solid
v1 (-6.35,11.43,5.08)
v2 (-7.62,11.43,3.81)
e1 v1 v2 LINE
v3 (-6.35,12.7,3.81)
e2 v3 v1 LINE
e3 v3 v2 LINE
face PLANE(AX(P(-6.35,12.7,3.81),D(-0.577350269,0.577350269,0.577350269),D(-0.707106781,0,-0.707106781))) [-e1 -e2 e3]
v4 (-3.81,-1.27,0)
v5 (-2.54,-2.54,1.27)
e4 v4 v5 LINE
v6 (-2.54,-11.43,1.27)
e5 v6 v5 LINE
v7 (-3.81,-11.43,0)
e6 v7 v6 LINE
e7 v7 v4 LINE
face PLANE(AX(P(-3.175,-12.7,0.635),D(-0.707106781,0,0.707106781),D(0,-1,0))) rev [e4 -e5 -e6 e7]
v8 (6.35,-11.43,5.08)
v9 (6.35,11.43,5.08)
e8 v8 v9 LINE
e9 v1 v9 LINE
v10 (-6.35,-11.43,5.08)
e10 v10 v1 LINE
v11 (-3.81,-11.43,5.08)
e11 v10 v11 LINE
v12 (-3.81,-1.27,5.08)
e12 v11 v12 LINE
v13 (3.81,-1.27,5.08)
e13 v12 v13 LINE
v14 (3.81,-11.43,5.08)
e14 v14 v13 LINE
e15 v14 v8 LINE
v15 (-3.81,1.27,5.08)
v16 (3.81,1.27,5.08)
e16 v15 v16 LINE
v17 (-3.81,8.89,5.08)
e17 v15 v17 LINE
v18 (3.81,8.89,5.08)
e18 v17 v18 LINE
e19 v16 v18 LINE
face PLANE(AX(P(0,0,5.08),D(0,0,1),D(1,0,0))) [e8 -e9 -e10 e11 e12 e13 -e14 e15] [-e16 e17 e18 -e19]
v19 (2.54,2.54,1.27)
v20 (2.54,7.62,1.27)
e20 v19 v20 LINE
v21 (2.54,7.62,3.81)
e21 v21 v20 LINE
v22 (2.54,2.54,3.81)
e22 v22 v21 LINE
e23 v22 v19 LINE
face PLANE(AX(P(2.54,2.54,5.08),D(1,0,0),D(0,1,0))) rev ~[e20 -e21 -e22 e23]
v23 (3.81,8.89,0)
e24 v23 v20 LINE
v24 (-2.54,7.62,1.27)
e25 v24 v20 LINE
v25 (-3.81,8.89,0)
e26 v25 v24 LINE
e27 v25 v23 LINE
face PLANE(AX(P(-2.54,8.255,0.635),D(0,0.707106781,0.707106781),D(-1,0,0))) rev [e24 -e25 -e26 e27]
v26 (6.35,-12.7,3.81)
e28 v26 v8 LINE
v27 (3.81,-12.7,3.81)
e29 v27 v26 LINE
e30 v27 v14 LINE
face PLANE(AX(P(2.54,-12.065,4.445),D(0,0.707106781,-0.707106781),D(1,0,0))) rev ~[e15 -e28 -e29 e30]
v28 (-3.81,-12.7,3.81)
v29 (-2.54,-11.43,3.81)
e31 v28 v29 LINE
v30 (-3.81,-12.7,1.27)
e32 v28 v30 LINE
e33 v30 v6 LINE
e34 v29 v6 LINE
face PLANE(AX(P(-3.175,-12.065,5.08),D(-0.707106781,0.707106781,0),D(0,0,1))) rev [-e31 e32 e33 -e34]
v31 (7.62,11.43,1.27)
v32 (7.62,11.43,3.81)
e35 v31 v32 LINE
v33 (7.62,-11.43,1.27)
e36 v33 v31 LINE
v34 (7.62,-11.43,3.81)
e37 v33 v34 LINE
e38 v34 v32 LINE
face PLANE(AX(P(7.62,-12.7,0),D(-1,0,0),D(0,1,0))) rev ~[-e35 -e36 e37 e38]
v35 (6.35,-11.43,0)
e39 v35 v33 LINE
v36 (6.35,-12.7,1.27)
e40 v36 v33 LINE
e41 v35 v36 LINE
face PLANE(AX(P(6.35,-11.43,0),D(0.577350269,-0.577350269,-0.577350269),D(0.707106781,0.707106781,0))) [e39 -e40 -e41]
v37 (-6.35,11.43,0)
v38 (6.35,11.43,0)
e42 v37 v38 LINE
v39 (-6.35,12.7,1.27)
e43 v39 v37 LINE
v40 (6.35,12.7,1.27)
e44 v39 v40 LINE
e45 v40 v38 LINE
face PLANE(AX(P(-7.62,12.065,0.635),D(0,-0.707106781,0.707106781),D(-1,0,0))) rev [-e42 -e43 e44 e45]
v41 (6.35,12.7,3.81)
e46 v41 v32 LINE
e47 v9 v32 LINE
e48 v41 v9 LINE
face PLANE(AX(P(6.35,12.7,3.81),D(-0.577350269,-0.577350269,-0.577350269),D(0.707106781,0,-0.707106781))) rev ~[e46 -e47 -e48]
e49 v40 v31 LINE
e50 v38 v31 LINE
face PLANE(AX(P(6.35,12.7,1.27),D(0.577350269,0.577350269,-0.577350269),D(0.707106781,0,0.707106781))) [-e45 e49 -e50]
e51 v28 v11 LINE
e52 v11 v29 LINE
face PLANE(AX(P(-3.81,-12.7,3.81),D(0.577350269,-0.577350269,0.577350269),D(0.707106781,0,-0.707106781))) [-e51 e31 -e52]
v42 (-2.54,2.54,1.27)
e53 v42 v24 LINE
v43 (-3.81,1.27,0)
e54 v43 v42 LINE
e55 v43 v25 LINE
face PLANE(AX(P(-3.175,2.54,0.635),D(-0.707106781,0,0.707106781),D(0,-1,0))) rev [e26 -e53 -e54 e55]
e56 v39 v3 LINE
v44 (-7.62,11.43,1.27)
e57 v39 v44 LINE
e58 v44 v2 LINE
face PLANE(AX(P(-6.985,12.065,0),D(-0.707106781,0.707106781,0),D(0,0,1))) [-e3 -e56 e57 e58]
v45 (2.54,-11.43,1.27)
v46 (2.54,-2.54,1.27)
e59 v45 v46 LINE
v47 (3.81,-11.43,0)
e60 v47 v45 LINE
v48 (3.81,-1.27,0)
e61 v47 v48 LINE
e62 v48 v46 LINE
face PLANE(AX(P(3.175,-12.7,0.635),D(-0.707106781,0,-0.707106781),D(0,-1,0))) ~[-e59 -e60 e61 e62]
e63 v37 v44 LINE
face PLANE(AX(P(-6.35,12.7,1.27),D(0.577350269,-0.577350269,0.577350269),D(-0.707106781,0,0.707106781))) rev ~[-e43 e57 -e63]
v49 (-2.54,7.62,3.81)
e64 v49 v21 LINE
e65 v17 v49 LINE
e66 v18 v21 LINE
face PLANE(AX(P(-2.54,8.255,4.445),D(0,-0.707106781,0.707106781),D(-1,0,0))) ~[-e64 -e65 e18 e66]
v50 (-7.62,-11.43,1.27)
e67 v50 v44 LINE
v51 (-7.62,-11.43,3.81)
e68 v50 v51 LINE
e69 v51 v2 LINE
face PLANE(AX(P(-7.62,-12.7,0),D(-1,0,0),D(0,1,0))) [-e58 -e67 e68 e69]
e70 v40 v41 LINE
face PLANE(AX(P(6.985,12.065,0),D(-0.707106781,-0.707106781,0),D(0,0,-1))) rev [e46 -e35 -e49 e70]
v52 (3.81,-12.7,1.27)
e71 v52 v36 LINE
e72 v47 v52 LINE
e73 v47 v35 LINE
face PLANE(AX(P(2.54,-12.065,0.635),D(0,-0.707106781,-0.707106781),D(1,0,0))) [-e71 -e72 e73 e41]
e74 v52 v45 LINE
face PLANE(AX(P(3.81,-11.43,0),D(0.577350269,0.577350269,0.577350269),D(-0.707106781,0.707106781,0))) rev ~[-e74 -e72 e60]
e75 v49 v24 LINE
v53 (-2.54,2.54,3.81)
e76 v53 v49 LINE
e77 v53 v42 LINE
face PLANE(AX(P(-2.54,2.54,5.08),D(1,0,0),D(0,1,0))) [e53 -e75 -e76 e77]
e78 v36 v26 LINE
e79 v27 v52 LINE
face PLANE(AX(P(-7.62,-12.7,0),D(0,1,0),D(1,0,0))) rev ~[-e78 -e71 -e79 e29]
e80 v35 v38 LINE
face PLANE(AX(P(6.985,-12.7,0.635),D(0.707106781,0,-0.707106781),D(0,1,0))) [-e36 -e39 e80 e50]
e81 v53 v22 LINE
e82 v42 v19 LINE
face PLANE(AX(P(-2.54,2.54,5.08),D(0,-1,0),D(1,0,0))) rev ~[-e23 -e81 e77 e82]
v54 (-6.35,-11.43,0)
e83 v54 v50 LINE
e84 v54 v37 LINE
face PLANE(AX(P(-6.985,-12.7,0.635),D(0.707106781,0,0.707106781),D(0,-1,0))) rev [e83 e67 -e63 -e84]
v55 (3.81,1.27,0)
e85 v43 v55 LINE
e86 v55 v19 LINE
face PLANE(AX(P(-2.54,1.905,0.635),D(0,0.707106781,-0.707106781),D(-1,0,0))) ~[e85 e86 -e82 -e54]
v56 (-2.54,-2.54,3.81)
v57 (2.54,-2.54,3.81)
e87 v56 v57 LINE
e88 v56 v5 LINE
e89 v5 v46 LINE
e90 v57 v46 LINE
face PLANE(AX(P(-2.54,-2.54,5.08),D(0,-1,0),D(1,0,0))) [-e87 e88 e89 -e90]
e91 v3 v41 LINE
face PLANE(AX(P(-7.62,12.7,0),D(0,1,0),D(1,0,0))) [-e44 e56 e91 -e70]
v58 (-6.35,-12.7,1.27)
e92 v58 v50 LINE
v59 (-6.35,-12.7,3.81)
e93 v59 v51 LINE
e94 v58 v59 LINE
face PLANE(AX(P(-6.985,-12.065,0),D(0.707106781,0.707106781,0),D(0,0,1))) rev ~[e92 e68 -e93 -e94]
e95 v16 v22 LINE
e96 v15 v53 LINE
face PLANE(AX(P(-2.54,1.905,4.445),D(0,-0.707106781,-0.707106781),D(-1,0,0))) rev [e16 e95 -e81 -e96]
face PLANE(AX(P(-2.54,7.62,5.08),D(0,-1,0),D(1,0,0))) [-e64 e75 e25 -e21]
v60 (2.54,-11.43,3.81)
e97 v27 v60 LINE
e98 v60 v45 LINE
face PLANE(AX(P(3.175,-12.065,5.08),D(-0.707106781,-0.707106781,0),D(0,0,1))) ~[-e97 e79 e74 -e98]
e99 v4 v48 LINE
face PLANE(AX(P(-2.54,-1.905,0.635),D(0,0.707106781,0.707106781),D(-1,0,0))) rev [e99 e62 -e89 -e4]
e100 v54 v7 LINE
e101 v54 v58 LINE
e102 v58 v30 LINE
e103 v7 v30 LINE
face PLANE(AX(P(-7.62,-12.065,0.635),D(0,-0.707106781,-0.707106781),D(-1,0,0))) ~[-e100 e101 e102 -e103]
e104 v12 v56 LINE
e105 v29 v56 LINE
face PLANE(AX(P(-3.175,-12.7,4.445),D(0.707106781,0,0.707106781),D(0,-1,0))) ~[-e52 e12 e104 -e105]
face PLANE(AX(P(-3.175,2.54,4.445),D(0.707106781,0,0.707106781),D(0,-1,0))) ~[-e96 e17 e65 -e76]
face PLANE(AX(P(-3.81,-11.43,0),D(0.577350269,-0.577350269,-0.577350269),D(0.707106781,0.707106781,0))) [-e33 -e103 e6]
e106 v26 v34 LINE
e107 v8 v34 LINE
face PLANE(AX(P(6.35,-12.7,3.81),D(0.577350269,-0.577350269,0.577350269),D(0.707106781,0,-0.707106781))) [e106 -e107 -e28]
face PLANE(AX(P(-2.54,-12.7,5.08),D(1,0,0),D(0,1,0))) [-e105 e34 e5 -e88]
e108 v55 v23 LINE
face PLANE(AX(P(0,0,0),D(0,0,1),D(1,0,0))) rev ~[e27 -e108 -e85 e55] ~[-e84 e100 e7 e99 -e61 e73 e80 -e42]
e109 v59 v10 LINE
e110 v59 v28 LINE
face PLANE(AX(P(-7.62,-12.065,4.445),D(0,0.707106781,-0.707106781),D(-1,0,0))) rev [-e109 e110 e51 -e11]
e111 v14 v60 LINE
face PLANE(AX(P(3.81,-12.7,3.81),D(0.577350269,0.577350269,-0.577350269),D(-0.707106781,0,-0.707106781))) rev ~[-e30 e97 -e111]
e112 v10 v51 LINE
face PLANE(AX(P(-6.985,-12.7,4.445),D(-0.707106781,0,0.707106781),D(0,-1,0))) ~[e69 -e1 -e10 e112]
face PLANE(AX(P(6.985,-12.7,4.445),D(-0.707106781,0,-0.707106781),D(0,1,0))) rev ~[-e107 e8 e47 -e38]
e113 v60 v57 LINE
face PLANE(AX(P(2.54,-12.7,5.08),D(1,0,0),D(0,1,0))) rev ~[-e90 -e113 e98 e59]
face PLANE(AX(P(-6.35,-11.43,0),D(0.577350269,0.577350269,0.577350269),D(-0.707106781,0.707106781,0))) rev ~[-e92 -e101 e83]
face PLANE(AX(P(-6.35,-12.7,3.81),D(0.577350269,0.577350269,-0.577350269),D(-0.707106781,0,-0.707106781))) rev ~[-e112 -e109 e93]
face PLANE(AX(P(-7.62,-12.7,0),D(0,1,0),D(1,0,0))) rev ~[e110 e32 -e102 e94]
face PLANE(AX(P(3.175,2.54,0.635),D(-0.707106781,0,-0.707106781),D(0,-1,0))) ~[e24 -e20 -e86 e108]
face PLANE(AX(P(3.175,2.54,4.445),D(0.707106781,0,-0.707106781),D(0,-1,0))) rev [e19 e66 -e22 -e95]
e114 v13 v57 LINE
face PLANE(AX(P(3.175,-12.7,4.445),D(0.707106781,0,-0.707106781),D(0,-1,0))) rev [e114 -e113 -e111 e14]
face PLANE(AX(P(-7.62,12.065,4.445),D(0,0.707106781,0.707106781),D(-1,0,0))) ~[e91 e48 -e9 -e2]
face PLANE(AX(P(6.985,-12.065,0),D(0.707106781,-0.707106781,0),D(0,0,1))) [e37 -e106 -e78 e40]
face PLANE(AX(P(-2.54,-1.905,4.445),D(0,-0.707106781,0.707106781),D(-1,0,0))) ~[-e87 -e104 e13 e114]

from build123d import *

# Parameters (mm, degrees)
F0_W     = 15.24
F0_H     = 25.4
F1_DEPTH = 5.08
F2_W     = 5.08
F2_H     = 5.08
F2_H_2   = 10.16
F3_DEPTH = 5.08
F4_SIZE  = 1.27


with BuildPart() as f1:
    # F0 (on Top) → F1 (new body)
    with BuildSketch(Plane.XY):
        Rectangle(F0_W, F0_H)
    extrude(amount=F1_DEPTH)

    # F2 (on face) → F3 (cut)
    with BuildSketch(Plane.XY.offset(5.08)):
        with Locations((0, 5.08)):
            Rectangle(F2_W, F2_H)
        with Locations((0, -7.62)):
            Rectangle(F2_W, F2_H_2)
    extrude(amount=-F3_DEPTH, mode=Mode.SUBTRACT)

    # F4
    f4_edges = [f1.edges().sort_by_distance(p)[0] for p in [
        (0, 7.62, 5.08),
        (0, 7.62, 0),
        (-2.54, 5.08, 5.08),
        (0, 2.54, 5.08),
        (2.54, 5.08, 5.08),
        (0, -2.54, 5.08),
        (-2.54, -7.62, 5.08),
        (2.54, -7.62, 5.08),
        (-7.62, 0, 5.08),
        (7.62, 0, 5.08),
        (0, 12.7, 5.08),
        (-5.08, -12.7, 5.08),
        (5.08, -12.7, 5.08),
        (-2.54, -12.7, 2.54),
        (2.54, -12.7, 2.54),
        (7.62, -12.7, 2.54),
        (-7.62, -12.7, 2.54),
        (-5.08, -12.7, 0),
        (5.08, -12.7, 0),
        (-7.62, 0, 0),
        (7.62, 0, 0),
        (-2.54, -7.62, 0),
        (2.54, -7.62, 0),
        (0, -2.54, 0),
        (0, 12.7, 0),
        (-2.54, 5.08, 0),
        (0, 2.54, 0),
        (2.54, 5.08, 0),
        (-7.62, 12.7, 2.54),
        (7.62, 12.7, 2.54),
    ]]
    chamfer(f4_edges, length=F4_SIZE)


solid = f1.part
